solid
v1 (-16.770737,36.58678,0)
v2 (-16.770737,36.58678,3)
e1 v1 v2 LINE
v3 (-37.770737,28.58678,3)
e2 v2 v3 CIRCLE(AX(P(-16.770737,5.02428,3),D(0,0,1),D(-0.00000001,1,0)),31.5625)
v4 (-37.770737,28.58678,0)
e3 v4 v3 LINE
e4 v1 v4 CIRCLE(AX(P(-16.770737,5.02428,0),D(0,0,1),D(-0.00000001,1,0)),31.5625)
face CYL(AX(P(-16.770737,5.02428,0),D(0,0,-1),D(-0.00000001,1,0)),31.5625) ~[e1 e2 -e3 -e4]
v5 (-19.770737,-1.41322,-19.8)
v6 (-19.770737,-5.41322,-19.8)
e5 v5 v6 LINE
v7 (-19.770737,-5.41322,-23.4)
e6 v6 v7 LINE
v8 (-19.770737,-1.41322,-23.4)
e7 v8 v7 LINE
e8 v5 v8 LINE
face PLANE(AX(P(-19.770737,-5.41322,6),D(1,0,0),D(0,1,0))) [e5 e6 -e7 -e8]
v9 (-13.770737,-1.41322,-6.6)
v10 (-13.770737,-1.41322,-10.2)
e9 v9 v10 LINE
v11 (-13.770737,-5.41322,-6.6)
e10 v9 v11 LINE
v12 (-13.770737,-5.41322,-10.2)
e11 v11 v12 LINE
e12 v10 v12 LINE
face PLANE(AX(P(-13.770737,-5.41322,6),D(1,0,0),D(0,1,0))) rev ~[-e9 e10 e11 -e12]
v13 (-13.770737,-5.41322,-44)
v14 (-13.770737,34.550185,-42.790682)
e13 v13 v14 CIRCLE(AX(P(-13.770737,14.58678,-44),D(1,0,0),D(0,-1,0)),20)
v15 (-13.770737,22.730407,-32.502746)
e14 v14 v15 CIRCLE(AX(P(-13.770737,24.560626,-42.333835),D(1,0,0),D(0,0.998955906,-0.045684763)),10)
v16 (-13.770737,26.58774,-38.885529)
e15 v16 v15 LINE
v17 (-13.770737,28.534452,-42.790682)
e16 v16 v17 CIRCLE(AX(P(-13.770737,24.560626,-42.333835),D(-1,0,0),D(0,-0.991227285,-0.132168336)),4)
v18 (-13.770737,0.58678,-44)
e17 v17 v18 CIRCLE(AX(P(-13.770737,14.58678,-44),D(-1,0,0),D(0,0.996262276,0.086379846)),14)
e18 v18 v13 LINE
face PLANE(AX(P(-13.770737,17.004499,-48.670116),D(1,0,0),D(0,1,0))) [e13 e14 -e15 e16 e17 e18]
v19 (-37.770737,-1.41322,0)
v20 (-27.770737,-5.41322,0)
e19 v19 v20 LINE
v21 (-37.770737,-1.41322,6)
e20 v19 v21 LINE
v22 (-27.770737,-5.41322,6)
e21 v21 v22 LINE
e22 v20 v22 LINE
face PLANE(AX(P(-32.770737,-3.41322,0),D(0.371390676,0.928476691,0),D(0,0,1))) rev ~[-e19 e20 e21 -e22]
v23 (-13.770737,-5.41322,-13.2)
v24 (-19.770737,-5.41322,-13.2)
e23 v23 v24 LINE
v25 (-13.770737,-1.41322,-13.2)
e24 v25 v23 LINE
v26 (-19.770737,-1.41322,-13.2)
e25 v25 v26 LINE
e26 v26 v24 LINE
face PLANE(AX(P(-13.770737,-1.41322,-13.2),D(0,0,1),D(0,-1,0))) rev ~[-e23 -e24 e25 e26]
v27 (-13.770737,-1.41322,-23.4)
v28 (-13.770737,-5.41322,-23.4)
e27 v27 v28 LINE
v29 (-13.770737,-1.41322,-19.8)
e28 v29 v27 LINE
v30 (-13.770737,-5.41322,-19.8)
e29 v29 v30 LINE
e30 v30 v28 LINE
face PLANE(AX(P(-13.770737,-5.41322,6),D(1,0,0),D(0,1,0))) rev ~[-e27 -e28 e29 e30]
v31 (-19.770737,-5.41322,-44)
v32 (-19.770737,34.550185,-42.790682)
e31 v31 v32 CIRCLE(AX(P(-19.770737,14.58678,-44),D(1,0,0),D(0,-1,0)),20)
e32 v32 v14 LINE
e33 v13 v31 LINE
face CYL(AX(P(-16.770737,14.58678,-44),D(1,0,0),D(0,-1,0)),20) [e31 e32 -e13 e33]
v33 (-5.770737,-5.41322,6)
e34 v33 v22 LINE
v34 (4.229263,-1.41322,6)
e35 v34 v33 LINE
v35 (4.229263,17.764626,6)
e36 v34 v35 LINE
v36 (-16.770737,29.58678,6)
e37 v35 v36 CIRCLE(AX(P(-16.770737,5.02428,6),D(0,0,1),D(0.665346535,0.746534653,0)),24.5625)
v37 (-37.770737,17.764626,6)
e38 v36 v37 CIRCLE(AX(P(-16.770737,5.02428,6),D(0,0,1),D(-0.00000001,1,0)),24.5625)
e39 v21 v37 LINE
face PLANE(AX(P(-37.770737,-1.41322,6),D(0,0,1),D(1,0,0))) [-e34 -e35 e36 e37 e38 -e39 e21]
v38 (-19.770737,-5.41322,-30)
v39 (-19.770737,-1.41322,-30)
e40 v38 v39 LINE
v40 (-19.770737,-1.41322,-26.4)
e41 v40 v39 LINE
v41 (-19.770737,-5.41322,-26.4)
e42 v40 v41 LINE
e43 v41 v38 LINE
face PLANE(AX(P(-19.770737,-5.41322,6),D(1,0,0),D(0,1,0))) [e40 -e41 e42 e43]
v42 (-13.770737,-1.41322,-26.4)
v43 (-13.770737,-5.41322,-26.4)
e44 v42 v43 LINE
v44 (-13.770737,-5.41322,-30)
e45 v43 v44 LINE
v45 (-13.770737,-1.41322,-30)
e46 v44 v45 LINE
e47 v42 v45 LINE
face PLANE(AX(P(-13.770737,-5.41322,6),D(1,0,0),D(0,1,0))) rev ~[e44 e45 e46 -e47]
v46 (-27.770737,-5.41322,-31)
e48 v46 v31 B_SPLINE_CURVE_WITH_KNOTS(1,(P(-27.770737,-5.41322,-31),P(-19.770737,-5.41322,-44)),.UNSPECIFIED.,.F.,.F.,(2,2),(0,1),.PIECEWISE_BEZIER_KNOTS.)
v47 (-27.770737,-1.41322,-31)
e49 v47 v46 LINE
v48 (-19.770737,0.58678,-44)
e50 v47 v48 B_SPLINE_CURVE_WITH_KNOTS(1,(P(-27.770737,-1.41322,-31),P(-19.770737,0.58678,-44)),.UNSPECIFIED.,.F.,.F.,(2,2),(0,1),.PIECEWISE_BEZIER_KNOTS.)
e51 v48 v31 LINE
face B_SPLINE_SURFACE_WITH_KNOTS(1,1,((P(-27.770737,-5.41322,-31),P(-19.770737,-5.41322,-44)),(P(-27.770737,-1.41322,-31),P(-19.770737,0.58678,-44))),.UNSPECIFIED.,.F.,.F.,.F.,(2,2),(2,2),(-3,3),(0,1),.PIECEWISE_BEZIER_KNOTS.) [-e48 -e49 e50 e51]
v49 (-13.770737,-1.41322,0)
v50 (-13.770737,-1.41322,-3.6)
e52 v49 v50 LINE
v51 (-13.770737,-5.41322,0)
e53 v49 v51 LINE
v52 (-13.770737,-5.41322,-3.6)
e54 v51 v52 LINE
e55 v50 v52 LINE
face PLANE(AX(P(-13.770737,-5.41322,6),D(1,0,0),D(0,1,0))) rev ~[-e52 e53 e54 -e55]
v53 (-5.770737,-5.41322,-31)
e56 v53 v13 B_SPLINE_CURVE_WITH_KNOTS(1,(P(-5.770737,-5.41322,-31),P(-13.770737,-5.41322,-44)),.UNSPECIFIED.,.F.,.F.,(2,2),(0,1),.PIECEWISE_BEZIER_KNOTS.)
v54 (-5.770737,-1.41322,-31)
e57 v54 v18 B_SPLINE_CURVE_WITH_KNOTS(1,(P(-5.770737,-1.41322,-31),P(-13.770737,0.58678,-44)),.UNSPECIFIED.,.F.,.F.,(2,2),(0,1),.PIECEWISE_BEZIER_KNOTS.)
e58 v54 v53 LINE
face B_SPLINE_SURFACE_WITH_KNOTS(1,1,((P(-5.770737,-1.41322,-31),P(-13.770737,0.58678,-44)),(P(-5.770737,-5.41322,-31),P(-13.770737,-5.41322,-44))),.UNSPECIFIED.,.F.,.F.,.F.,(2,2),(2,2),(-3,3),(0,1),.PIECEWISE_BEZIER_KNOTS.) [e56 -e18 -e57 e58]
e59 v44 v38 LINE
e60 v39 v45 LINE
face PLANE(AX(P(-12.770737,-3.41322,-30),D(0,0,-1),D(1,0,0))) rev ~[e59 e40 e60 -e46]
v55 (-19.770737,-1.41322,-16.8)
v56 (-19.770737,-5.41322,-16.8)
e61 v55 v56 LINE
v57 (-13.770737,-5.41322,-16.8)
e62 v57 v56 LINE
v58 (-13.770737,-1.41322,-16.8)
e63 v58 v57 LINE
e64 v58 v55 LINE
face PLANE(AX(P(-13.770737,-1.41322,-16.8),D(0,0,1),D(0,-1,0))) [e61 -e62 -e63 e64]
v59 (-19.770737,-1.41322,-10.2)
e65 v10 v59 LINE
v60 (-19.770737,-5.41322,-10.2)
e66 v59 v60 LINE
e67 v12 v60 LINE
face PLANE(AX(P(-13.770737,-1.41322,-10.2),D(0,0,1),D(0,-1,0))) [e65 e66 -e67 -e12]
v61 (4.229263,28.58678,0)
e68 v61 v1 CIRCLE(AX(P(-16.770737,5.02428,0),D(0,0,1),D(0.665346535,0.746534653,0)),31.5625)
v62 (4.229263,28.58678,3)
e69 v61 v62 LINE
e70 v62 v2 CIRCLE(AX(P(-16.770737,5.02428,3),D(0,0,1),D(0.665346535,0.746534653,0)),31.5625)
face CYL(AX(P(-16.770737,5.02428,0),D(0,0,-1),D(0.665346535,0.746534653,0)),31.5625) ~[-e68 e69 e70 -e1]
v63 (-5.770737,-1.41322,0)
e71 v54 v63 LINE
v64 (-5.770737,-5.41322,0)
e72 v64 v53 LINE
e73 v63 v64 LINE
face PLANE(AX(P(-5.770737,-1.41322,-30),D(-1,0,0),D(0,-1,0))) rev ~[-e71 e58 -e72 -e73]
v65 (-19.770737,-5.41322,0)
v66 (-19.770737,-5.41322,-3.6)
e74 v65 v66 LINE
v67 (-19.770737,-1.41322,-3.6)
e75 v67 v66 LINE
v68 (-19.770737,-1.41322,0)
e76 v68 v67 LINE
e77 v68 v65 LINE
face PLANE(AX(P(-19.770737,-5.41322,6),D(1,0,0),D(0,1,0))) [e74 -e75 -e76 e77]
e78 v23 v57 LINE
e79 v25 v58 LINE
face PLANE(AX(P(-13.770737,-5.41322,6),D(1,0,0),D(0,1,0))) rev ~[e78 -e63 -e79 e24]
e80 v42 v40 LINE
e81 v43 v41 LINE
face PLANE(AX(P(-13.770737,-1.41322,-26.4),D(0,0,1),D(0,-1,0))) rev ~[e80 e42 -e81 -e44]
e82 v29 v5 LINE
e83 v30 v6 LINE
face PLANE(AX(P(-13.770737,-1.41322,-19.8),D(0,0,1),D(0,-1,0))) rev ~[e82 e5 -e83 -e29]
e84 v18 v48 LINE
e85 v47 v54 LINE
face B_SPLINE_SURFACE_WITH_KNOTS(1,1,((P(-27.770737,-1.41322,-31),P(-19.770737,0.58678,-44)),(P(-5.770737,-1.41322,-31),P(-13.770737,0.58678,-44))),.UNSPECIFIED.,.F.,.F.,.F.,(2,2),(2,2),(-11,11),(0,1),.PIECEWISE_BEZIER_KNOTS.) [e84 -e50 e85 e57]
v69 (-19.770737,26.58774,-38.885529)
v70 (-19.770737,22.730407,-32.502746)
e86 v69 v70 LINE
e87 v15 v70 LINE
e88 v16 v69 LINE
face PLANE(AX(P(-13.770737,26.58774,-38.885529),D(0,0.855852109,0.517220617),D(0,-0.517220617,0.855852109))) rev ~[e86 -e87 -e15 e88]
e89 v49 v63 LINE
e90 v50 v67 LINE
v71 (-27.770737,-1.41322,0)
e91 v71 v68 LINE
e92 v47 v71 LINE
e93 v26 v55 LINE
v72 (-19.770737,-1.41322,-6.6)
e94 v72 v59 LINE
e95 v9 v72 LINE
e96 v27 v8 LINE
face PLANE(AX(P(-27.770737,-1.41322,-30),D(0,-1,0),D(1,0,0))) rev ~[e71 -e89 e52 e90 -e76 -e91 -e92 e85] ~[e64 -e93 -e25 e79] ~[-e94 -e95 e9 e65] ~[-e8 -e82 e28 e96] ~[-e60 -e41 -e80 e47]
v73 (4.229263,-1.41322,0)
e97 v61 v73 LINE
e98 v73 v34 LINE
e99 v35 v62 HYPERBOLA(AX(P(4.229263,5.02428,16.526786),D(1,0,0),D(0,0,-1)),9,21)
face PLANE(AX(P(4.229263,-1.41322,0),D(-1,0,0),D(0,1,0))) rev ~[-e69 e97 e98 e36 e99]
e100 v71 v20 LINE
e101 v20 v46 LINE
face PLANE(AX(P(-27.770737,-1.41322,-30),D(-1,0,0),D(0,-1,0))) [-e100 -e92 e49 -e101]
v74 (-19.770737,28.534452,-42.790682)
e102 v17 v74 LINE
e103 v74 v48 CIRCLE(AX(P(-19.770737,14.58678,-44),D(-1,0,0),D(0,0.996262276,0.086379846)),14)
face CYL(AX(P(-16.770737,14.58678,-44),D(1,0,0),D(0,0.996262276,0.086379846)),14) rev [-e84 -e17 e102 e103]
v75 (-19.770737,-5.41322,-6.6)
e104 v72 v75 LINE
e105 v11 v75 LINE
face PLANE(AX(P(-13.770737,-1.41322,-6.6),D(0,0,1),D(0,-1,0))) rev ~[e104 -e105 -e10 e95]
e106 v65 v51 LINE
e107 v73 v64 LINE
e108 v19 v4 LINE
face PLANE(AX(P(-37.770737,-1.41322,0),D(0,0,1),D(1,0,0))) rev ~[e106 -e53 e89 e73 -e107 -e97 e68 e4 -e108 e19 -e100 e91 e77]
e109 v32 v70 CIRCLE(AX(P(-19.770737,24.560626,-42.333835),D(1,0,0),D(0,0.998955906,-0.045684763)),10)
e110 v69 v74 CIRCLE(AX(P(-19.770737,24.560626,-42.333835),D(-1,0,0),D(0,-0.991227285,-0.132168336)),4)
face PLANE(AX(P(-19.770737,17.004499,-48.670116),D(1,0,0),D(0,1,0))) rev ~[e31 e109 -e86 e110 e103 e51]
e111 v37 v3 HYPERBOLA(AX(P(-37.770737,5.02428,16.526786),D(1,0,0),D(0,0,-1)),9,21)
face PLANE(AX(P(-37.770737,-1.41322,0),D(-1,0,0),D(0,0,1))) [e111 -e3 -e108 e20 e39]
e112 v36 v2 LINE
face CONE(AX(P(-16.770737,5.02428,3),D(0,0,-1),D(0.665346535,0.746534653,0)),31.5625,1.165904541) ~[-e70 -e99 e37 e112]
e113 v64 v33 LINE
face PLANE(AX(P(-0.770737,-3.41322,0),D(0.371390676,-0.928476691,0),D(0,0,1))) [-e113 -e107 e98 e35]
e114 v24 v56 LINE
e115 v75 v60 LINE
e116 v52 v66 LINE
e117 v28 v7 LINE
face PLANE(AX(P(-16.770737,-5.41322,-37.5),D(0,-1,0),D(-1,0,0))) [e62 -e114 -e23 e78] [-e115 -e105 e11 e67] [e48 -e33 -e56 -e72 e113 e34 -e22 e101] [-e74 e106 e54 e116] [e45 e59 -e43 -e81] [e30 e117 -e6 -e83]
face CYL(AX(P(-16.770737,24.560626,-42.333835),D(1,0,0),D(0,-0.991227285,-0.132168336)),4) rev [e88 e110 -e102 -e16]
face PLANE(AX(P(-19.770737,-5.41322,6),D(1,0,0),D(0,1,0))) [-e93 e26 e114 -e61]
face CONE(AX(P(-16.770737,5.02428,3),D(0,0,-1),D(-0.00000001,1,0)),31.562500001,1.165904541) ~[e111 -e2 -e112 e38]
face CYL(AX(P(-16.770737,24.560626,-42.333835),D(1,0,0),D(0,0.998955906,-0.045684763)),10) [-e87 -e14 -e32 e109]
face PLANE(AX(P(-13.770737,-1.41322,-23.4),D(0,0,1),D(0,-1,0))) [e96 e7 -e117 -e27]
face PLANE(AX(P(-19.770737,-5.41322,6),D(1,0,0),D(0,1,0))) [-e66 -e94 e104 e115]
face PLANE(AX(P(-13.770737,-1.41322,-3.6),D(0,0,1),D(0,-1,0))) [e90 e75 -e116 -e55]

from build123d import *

# Parameters (mm, degrees)
F1_DEPTH    = 6
F2_W        = 8
F2_H        = 4
F3_DEPTH    = 36
F4_DEPTH    = 4
F5_C1_SIZE2 = 10
F5_C1_SIZE  = 4
F5_C2_SIZE2 = 10
F5_C2_SIZE  = 4
F6_W        = 4
F6_H        = 3
F7_DEPTH    = 6
F10_DEPTH   = 3
F11_W       = 14
F11_H       = 4
F11_W_2     = 8
F12_DEPTH   = 1
F12_FACE_W  = 22
F12_FACE_H  = 4
F10_FACE_W  = 6
F10_FACE_H  = 6
F15_DEPTH   = 109
F16_SIZE2   = 3
F16_SIZE    = 7


# Not quite as in the source:
# - an extrude ends at something that could not be found from the text; its depth is read off the source's solid


with BuildPart() as f1:
    # F0 (on Top) → F1 (new body)
    with BuildSketch(Plane.XY):
        with BuildLine():
            ThreePointArc((4.2292630374, 28.5867799968), (-5.5346345873, 34.5190491883), (-16.7707372875, 36.5867799968))
            ThreePointArc((-16.7707372875, 36.5867799968), (-28.0068396415, 34.5190490726), (-37.7707369626, 28.5867799968))
            Line((-37.7707369626, 28.5867799968), (-37.7707369626, -1.4132200032))
            Line((-37.7707369626, -1.4132200032), (4.2292630374, -1.4132200032))
            Line((4.2292630374, -1.4132200032), (4.2292630374, 28.5867799968))
        make_face()
    extrude(amount=F1_DEPTH)

    # F2 (on face) → F3 (join)
    with BuildSketch(Plane.XY.offset(6)):
        with Locations((-23.7707369626, -3.4132200032)):
            Rectangle(F2_W, F2_H)
        with Locations((-9.7707369626, -3.4132200032)):
            Rectangle(F2_W, F2_H)
    extrude(amount=-F3_DEPTH)

    # F4 (add): faces of the model
    f4_faces = [f1.faces().sort_by_distance(p)[0] for p in [
        (-32.7707369626, -1.4132200032, 3),
        (-0.7707369626, -1.4132200032, 3),
        (-16.7707369626, -1.4132200032, 3),
    ]]
    extrude(f4_faces, amount=F4_DEPTH)

    # F5: chamfer of 10 x 4 on 2 edges, made by hand

    # F5_c1
    f5_c1_edges = [f1.edges().sort_by_distance(p)[0] for p in [
        (-37.7707369626, -5.4132200032, 3),
    ]]
    f5_c1_side = f1.faces().sort_by_distance((-37.7707369626, -5.3332200032, 3))[0]
    chamfer(f5_c1_edges, length=F5_C1_SIZE, length2=F5_C1_SIZE2, reference=f5_c1_side)

    # F5_c2
    f5_c2_edges = [f1.edges().sort_by_distance(p)[0] for p in [
        (4.2292630374, -5.4132200032, 3),
    ]]
    f5_c2_side = f1.faces().sort_by_distance((4.2292630374, -5.3332200032, 3))[0]
    chamfer(f5_c2_edges, length=F5_C2_SIZE, length2=F5_C2_SIZE2, reference=f5_c2_side)

    # F6 (on face) → F7 (join, through all)
    with BuildSketch(Plane(origin=(-13.7707369626, 0, 0), x_dir=(0, -1, 0), z_dir=(-1, 0, 0))):
        with Locations((3.4132200032, -24.9)):
            Rectangle(F6_W, F6_H)
        with Locations((3.4132200032, -18.3)):
            Rectangle(F6_W, F6_H)
        with Locations((3.4132200032, -11.7)):
            Rectangle(F6_W, F6_H)
        with Locations((3.4132200032, -5.1)):
            Rectangle(F6_W, F6_H)
    extrude(amount=F7_DEPTH)

    # F11 (on face) → F12 (join)
    with BuildSketch(Plane(origin=(0, 0, -30), x_dir=(1, 0, 0), z_dir=(0, 0, -1))):
        with Locations((-12.7707369626, 3.4132200032)):
            Rectangle(F11_W, F11_H)
        with Locations((-23.7707369626, 3.4132200032)):
            Rectangle(F11_W_2, F11_H)
    extrude(amount=F12_DEPTH)



with BuildPart() as f10:
    # F9 (on line) → F10 (new body, symmetric)
    with BuildSketch(Plane.YZ.offset(-16.7707369626)):
        with BuildLine():
            ThreePointArc((-5.4132200032, -44), (15.1917157006, -63.9908492264), (34.5501852762, -42.7906821553))
            ThreePointArc((34.5501852762, -42.7906821553), (24.5246696764, -32.3338991708), (14.5746107682, -42.8625078704))
            Line((14.5746107682, -42.8625078704), (20.5957170737, -42.8625078704))
            ThreePointArc((20.5957170737, -42.8625078704), (24.5244376896, -38.3339982315), (28.5344518581, -42.7906821553))
            ThreePointArc((28.5344518581, -42.7906821553), (15.1920047243, -57.9869118475), (0.5867799968, -44))
            Line((0.5867799968, -44), (-5.4132200032, -44))
        make_face()
    extrude(amount=F10_DEPTH, both=True)


with BuildPart() as f1_1:
    add(f1.part)

    add(f10.part)  # F13 merges F10
    # F12_face (on face) → F13 section 0
    with BuildSketch(Plane(origin=(-16.7707369626, -3.4132200032, -31), x_dir=(1, 0, 0), z_dir=(0, 0, -1))):
        Rectangle(F12_FACE_W, F12_FACE_H)
    # F10_face (on face) → F13 section 1
    with BuildSketch(Plane(origin=(-16.7707369626, -2.4132200032, -44), x_dir=(1, 0, 0), z_dir=(0, 0, 1))):
        Rectangle(F10_FACE_W, F10_FACE_H)
    loft()

    # F14 (on face) → F15 (cut, through all)
    with BuildSketch(Plane.YZ.offset(-13.7707369626)):
        with BuildLine():
            Line((22.7304068946, -32.502746223), (21.8552816659, -31.0546644032))
            Line((21.8552816659, -31.0546644032), (14.088241172, -33.6755602773))
            Line((14.088241172, -33.6755602773), (14.5746107682, -42.8625078704))
            ThreePointArc((14.5746107682, -42.8625078704), (16.7033355644, -36.1481265127), (22.7304068946, -32.502746223))
        make_face()
        with BuildLine():
            Line((26.5877404927, -38.885529479), (22.7304068946, -32.502746223))
            ThreePointArc((22.7304068946, -32.502746223), (16.7033355644, -36.1481265127), (14.5746107682, -42.8625078704))
            Line((14.5746107682, -42.8625078704), (20.5957170737, -42.8625078704))
            ThreePointArc((20.5957170737, -42.8625078704), (22.3486471202, -39.0010956404), (26.5877404927, -38.885529479))
        make_face()
    extrude(amount=-F15_DEPTH, mode=Mode.SUBTRACT)

    # F16
    f16_edges = [f1_1.edges().sort_by_distance(p)[0] for p in [
        (-16.770737, 36.58678, 6),
    ]]
    f16_side = f1_1.faces().sort_by_distance((-16.770737, 14.854781, 6))[0]
    chamfer(f16_edges, length=F16_SIZE, length2=F16_SIZE2, reference=f16_side)


solid = f1_1.part
